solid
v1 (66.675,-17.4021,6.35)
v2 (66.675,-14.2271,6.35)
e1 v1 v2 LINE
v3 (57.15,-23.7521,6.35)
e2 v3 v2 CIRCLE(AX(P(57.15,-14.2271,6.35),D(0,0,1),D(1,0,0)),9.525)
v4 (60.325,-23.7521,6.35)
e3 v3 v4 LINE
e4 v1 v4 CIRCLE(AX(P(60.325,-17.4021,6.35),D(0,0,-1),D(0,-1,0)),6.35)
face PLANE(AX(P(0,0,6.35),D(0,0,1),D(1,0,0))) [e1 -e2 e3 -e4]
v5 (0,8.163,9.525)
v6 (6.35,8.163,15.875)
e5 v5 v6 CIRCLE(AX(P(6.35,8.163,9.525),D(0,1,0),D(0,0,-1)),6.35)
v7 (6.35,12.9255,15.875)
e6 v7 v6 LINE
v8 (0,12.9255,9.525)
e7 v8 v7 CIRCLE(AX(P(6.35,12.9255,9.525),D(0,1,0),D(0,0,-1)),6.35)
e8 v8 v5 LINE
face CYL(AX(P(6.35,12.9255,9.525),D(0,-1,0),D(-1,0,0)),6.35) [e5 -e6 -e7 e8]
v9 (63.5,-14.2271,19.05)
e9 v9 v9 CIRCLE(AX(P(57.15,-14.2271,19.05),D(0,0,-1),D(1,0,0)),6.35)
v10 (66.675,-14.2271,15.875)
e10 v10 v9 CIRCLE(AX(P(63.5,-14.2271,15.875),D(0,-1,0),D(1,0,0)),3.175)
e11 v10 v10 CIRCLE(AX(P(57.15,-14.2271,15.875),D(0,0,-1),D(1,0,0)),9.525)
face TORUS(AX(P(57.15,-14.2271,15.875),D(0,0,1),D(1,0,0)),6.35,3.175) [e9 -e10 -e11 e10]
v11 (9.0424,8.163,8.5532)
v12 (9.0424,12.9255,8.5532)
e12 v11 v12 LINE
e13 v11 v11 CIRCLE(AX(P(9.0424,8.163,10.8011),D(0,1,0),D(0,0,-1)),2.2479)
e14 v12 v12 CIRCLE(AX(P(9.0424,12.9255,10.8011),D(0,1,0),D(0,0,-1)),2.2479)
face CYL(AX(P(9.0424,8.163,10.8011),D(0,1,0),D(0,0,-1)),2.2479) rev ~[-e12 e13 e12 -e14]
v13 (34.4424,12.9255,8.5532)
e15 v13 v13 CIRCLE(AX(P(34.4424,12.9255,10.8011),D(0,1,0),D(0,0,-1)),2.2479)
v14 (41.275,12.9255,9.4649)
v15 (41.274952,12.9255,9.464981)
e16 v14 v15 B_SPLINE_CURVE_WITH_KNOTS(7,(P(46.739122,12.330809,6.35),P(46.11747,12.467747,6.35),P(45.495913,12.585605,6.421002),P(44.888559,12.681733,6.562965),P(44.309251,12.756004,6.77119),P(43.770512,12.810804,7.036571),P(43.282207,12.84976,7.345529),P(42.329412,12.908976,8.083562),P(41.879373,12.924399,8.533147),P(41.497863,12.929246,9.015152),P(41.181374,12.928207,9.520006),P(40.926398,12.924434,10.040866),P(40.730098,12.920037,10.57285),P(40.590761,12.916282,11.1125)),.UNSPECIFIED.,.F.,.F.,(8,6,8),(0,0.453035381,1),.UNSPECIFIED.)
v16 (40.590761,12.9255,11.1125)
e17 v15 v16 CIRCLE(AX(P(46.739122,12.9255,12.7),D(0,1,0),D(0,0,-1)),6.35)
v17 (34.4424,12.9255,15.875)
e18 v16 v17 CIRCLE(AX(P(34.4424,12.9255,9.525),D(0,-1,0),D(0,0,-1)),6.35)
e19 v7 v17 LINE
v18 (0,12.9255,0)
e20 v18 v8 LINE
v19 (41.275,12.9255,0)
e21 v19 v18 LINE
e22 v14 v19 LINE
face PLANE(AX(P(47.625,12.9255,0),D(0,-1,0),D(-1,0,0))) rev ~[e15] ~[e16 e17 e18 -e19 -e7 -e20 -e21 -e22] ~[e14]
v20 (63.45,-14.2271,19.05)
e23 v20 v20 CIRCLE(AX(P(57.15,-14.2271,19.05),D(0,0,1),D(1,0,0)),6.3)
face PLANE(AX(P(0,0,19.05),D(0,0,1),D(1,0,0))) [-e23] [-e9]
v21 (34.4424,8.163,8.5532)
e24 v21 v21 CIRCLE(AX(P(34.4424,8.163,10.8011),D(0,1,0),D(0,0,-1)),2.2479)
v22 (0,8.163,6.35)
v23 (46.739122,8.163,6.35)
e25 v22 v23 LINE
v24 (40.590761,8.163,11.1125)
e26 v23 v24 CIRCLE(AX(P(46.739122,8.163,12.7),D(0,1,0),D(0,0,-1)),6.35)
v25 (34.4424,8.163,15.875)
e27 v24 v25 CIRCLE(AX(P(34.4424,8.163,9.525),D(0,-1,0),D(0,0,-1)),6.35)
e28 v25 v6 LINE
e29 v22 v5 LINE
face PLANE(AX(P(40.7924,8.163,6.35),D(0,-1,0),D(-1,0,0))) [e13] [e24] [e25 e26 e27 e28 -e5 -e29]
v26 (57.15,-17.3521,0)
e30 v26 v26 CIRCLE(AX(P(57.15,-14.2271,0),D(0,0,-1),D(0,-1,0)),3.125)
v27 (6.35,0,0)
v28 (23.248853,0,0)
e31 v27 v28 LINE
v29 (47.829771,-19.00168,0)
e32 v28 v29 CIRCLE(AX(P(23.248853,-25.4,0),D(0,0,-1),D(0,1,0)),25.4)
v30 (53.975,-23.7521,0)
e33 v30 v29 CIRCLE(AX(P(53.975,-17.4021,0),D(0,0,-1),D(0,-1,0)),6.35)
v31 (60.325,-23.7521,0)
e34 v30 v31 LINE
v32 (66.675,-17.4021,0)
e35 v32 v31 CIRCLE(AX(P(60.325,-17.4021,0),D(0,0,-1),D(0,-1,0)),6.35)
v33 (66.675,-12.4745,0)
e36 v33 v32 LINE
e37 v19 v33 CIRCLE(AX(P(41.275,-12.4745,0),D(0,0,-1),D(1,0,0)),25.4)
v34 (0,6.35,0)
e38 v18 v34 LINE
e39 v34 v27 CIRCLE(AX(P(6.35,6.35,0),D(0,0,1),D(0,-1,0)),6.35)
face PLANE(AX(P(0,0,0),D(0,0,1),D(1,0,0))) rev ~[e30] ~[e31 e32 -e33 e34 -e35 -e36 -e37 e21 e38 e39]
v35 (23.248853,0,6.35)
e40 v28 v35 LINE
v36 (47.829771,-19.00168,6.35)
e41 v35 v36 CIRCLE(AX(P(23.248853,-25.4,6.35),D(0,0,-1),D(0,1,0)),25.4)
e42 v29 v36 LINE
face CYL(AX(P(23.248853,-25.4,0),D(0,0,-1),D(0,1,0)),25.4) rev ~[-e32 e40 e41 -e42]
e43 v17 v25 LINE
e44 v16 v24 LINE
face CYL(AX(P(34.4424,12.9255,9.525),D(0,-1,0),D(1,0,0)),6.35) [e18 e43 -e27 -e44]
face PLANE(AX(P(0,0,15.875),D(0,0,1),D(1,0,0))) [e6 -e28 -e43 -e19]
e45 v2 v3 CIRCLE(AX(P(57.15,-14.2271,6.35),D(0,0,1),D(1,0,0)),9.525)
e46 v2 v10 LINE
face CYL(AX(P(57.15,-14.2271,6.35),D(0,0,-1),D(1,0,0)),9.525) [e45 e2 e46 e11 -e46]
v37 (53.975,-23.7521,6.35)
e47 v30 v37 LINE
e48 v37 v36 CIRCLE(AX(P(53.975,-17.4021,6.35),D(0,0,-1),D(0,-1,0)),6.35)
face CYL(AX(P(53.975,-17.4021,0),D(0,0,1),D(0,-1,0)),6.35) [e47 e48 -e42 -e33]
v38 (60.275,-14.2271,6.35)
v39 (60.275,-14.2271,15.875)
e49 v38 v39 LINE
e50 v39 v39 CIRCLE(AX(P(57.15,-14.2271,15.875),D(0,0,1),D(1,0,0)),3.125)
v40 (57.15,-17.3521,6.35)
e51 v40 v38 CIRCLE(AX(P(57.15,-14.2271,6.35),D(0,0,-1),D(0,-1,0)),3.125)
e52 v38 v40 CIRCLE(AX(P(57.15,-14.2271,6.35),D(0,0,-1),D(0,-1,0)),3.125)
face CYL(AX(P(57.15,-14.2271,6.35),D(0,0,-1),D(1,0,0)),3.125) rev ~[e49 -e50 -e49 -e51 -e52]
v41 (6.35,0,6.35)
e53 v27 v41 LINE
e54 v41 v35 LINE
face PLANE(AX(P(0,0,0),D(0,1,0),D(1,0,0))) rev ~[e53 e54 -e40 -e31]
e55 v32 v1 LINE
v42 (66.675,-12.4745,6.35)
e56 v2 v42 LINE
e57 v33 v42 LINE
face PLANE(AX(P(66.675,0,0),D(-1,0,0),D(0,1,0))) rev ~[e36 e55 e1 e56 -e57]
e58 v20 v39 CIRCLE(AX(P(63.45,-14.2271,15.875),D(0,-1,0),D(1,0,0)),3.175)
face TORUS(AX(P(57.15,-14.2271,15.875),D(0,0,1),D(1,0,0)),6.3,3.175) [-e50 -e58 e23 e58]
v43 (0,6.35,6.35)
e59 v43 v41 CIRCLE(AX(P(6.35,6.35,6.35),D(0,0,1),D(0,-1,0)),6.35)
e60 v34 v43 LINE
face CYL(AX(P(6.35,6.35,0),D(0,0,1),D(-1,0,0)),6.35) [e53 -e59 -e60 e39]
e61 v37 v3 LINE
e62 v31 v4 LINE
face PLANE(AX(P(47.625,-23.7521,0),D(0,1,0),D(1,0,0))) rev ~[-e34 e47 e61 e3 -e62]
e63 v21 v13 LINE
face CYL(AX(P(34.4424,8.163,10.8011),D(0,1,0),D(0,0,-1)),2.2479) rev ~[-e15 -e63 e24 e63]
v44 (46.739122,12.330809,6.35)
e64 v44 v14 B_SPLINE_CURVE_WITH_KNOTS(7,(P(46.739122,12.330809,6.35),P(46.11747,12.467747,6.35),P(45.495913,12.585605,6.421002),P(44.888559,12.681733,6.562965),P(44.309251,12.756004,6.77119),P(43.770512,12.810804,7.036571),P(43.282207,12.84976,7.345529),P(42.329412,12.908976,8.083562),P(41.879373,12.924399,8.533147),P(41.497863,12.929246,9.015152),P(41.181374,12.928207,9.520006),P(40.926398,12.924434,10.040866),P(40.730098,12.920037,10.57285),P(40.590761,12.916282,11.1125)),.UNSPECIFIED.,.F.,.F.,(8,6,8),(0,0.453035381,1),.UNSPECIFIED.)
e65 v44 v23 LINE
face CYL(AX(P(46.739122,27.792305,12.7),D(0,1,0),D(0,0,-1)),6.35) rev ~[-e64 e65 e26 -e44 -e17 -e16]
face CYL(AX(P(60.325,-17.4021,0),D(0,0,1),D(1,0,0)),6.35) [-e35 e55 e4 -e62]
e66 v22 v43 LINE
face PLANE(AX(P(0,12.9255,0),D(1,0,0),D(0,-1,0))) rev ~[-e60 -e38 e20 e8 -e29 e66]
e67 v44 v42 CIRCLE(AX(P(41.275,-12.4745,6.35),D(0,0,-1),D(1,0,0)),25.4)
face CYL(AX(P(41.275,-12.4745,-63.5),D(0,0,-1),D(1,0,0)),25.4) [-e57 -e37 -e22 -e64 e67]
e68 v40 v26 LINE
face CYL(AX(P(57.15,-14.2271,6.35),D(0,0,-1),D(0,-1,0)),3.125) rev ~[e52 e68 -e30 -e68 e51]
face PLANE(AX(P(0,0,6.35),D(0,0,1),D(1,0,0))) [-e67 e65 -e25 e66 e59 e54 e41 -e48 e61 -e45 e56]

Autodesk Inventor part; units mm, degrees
ref_plane "YZ Plane" through (0, 0, 0) normal (1, 0, 0) x (0, 1, 0)
ref_plane "XZ Plane" through (0, 0, 0) normal (0, 1, 0) x (-1, 0, 0)
sketch "Sketch1" plane through (0, 0, 0) normal (0, 0, 1) x (1, 0, 0)
  line L0 (0, 0) -> (66.675, 0)
  line L1 (66.675, 0) -> (66.675, 12.9255)
  line L2 (66.675, 12.9255) -> (0, 12.9255)
  line L3 (0, 12.9255) -> (0, 0)
  line L4 (66.675, 12.9255) -> (47.625, 12.9255)
  line L5 (47.625, 12.9255) -> (47.625, -23.7521)
  line L6 (47.625, -23.7521) -> (66.675, -23.7521)
  line L7 (66.675, -23.7521) -> (66.675, 12.9255)
  point P0 (57.15, -14.2271)
  point P1 (34.4424, 12.9255)
  point P2 (9.0424, 12.9255)
  dimension "d0" = 66.675
  dimension "d3" = 25.4
  dimension "d4" = 27.1526
  dimension "d5" = 0
  dimension "d41" = 48.1076
  dimension "d42" = 19.05
  dimension "d43" = 9.525
extrude "Extrusion1" add sketch "Sketch1" along normal blind 6.35
sketch "Sketch2" plane through (0, 0, 6.35) normal (0, 0, 1) x (1, 0, 0)
  line L0 (66.675, -23.7521) -> (66.675, 12.9255) projected
  line L1 (47.625, 0) -> (47.625, -23.7521) projected
  line L2 (66.675, 12.9255) -> (0, 12.9255) projected
  line L3 (47.625, -23.7521) -> (66.675, -23.7521) projected
  point P0 (0, 0)
  point P1 (57.15, -14.2271)
  dimension "d12" = 27.1526
  dimension "d44" = 9.525
  dimension "d45" = 9.525
  dimension "d46" = 9.525
hole "Hole1" at (57.15, -14.2271, 6.35) direction (0, 0, -1) diameter 6.25 depth 25.4 tip angle 118
sketch "Sketch3" plane through (0, 0, 6.35) normal (0, 0, 1) x (1, 0, 0)
  circle A0 centre (57.15, -14.2271) radius 3.125 projected
  circle A1 centre (57.15, -14.2271) radius 9.525
  line L0 (47.625, -23.7521) -> (66.675, -23.7521) projected
  point P0 (0, 0)
extrude "Extrusion2" add sketch "Sketch3" along normal blind 12.7
fillet "Fillet1" radius 6.35 2 edges at (66.675, -23.7521, 3.175) (47.625, -23.7521, 3.175)
fillet "Fillet2" radius 25.4 2 edges at (47.625, 0, 3.175) (66.675, 12.9255, 3.175)
sketch "Sketch4" plane through (0, 0, 6.35) normal (0, 0, 1) x (1, 0, 0)
  line L0 (0, 12.9255) -> (0, 0) projected
  line L1 (0, 12.9255) -> (40.7924, 12.9255)
  line L2 (40.7924, 12.9255) -> (40.7924, 8.163)
  line L3 (40.7924, 8.163) -> (0, 8.163)
  line L4 (0, 8.163) -> (0, 12.9255)
  circle A0 centre (57.15, -14.2271) radius 3.125 projected
  dimension "d24" = 16.3576
  dimension "d25" = 4.7625
extrude "Extrusion3" add sketch "Sketch4" along normal blind 9.525 contours L1 L2 L3 L0
fillet "Fillet3" radius 6.35 2 edges at (40.7924, 10.5443, 15.875) (0, 10.5443, 15.875)
fillet "Fillet4" radius 6.35 1 edges at (40.7924, 10.5443, 6.35)
sketch "Sketch5" plane through (6.35, 8.163, 15.875) normal (0, -1, 0) x (1, 0, 0)
  line L0 (47.675, 3.175) -> (53.925, 3.175) projected
  point P0 (-6.35, -15.875)
  point P1 (2.6924, -5.0739)
  point P2 (28.0924, -5.0739)
  point P3 (50.8, 3.175)
  dimension "d30" = 25.4
  dimension "d31" = 22.7076
hole "Hole2" at (9.0424, 8.163, 10.8011) at (34.4424, 8.163, 10.8011) at (57.15, 8.163, 19.05) direction (0, 1, 0) diameter 4.4958 depth 25.4 tip angle 118 clearance for "Flat Head Machine Screw (82)" size "#8" standard "Ansi Unified Screw Threads"
fillet "Fillet5" radius 6.35 1 edges at (0, 0, 3.175)
fillet "Fillet6" radius 3.175 1 edges at (47.625, -14.2271, 19.05)
fillet "Fillet7" radius 3.175 1 edges at (54.025, -14.2271, 19.05)
ref_plane "Work Plane1" through (-0.254, 8.163, 9.525) normal (-1, 0, 0) x (0, 0, 1)
equation "\"d44\" = d45"
properties part number "supporty"
